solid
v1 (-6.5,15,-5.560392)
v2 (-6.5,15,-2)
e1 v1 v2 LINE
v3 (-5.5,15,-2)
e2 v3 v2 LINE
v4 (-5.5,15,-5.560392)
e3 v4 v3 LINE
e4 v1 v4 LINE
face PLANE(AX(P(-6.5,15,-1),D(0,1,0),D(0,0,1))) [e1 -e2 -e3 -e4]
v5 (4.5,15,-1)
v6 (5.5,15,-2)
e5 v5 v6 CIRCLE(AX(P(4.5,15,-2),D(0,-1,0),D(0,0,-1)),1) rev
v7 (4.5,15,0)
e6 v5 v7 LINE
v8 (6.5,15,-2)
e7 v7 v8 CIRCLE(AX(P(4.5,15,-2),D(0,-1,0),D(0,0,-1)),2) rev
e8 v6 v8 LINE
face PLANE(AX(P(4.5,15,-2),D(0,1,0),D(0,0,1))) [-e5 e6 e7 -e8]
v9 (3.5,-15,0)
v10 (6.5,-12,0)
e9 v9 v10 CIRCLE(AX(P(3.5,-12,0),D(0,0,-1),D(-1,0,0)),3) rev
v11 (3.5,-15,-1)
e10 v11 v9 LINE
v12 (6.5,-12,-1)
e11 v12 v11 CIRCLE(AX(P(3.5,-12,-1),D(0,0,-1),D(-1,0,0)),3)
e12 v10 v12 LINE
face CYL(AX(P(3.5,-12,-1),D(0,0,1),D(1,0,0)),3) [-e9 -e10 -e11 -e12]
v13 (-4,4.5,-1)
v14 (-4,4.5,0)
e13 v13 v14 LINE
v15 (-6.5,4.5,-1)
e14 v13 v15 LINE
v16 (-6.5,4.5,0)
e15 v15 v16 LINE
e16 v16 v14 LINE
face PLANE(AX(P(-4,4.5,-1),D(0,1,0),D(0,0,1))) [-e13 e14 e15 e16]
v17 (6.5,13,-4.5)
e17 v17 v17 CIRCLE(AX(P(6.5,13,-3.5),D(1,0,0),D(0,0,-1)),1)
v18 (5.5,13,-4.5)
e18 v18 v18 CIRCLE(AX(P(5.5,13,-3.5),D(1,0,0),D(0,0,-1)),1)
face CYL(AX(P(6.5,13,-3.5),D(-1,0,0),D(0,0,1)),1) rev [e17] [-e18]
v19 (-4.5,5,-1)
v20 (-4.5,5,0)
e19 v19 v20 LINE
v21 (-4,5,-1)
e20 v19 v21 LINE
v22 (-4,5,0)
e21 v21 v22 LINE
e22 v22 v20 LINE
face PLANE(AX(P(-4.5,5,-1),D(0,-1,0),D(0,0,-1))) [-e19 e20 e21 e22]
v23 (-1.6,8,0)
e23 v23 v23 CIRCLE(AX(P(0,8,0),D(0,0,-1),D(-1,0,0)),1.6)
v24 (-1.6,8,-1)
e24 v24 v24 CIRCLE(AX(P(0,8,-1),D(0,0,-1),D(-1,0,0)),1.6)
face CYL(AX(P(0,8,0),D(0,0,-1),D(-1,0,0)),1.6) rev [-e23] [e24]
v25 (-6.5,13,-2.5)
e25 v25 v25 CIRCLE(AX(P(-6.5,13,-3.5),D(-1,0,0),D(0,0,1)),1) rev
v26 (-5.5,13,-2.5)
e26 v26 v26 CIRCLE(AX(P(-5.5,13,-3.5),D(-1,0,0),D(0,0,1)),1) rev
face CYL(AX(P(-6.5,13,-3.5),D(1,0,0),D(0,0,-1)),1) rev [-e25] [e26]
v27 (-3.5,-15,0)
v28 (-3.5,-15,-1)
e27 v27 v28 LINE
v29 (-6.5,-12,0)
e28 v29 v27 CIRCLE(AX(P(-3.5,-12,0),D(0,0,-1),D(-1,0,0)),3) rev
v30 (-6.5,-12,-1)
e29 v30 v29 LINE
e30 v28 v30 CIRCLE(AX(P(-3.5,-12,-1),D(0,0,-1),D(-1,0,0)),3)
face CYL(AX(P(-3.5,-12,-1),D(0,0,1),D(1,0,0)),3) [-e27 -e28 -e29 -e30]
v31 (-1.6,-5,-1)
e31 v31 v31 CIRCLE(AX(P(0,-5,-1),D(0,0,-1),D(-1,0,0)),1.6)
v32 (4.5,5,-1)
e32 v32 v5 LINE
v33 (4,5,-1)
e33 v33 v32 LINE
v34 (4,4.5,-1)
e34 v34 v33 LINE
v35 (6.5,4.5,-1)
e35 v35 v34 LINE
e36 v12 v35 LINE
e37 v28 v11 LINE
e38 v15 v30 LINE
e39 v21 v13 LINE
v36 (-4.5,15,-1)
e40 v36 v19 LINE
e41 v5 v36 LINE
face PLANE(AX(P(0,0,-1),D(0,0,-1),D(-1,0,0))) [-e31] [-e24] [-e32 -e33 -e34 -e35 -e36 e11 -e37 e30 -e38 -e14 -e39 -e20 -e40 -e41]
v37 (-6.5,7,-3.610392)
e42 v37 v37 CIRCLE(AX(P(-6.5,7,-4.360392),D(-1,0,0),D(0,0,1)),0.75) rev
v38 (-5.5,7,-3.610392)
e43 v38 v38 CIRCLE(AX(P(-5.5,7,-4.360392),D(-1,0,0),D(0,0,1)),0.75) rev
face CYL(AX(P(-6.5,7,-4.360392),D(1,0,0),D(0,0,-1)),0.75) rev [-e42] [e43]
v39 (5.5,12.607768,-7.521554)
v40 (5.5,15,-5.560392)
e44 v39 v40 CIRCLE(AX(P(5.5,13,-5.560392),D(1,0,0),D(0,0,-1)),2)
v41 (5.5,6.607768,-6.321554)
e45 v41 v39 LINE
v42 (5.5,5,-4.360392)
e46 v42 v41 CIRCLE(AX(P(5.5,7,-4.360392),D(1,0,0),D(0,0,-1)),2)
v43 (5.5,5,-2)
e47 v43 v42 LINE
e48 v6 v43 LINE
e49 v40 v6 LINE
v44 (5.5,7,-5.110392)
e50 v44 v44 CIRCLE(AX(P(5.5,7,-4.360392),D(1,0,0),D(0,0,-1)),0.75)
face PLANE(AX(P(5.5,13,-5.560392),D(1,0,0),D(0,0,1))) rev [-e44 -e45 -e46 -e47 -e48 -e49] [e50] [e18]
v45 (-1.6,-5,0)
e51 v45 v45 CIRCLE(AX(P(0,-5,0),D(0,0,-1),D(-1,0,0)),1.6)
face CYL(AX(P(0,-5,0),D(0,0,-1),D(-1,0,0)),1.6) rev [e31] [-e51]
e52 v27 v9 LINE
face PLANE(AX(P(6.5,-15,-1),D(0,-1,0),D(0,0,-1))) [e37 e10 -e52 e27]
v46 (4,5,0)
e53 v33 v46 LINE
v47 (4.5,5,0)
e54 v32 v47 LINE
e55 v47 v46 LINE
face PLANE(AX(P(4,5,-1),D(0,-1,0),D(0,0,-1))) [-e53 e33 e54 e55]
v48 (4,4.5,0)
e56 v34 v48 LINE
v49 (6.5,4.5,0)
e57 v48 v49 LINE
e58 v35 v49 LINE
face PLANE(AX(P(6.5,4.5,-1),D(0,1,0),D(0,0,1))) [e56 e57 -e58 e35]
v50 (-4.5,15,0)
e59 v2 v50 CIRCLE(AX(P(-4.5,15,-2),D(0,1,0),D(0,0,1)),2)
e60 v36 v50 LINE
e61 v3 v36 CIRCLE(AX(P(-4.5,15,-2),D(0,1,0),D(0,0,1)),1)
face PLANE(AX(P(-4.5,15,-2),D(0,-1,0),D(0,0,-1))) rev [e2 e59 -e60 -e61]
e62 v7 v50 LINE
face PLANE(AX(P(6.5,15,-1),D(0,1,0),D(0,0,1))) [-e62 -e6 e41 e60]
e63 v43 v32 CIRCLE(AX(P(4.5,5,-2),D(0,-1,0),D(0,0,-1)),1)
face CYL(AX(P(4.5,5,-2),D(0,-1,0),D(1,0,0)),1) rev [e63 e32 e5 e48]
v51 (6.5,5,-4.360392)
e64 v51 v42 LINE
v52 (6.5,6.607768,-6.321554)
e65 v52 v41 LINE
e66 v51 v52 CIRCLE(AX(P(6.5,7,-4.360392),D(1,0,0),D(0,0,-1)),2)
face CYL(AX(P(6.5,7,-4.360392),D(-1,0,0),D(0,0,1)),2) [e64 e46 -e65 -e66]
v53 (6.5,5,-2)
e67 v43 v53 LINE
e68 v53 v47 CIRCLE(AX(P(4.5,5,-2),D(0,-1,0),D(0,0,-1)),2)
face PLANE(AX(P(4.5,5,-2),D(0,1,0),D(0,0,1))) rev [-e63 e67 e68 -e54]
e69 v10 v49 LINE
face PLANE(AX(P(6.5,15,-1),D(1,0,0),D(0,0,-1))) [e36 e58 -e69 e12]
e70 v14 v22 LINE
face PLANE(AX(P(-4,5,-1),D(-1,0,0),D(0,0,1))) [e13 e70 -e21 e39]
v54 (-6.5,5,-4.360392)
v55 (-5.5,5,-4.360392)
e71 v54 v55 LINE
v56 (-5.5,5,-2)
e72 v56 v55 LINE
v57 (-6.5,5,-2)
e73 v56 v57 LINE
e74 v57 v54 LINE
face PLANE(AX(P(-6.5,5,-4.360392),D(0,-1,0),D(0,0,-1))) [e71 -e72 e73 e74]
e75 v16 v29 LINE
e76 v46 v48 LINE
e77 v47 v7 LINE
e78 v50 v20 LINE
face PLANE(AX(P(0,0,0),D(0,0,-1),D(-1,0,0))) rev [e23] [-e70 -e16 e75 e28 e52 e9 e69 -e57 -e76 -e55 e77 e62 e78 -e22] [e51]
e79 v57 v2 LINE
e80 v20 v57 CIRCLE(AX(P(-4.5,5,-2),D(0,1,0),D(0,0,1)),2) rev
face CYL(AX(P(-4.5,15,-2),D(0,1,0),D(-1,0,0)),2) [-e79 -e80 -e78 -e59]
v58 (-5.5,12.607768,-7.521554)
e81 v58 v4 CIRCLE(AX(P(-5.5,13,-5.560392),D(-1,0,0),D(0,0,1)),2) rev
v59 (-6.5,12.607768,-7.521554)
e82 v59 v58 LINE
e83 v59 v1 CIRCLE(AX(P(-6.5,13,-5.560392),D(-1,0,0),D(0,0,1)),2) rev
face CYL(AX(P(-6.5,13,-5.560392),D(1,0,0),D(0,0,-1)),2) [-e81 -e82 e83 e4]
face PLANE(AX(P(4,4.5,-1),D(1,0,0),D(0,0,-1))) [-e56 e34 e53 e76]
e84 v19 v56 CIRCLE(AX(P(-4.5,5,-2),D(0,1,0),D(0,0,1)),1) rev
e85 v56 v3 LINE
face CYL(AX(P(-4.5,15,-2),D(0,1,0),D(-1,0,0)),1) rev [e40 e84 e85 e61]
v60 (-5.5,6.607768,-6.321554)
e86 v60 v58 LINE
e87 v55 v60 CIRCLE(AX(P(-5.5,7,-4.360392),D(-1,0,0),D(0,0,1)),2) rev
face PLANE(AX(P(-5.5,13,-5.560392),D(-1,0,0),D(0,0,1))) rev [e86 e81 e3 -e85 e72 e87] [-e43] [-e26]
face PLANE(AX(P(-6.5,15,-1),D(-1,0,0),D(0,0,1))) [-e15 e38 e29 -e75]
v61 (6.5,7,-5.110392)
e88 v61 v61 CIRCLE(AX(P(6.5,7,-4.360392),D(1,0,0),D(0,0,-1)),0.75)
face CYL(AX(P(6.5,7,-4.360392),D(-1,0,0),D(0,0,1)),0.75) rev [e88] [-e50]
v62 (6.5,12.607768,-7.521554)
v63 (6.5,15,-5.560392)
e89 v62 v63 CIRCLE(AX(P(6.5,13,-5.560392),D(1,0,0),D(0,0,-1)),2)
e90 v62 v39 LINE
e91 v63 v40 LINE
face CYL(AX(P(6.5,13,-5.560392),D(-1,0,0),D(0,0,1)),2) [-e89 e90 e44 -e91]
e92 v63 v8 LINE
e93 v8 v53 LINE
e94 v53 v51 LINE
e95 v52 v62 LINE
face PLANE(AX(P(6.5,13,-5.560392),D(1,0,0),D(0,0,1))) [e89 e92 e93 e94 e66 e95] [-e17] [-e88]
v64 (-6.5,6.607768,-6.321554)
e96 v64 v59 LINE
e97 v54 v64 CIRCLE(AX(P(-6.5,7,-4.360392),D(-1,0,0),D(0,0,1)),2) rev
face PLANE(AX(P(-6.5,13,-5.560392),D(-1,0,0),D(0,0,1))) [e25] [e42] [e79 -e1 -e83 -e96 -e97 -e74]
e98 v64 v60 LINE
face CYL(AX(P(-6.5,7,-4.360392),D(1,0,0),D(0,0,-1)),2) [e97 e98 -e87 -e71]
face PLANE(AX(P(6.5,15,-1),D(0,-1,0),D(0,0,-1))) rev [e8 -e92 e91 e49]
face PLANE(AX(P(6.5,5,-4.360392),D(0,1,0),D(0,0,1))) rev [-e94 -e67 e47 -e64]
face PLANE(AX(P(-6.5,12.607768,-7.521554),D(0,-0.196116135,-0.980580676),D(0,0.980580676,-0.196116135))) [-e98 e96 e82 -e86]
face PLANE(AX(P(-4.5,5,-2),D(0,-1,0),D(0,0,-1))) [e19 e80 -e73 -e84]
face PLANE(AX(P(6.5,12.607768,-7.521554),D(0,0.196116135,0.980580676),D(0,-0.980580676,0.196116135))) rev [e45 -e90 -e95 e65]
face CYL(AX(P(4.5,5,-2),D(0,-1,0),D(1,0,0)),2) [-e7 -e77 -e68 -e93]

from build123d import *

# Parameters (mm, degrees)
SKETCH_1_W                        = 13
SKETCH_1_H                        = 30
SM_BASE_FLANGE_1_DEPTH            = 1
SM_EDGE_FLANGE_1_STRIP_W          = 6
SM_EDGE_FLANGE_1_STRIP_H          = 1
SM_EDGE_FLANGE_1_STRIP_CUT_DEPTH  = 10
SM_EDGE_FLANGE_1_RELIEF_W         = 6.5
SM_EDGE_FLANGE_1_RELIEF_H         = 0.5
SM_EDGE_FLANGE_1_RELIEF_CUT_DEPTH = 1
SM_EDGE_FLANGE_1_DEPTH            = 10
SM_EDGE_FLANGE_1_PROFILE_R        = 1
SM_EDGE_FLANGE_1_PROFILE_R_2      = 0.75
SM_EDGE_FLANGE_1_FLAT_DEPTH       = 1
FILLET_1_R                        = 3
SKETCH_9_R                        = 1.6
CUT_EXTRUDE_1_DEPTH               = 18.615014781


# Sheet-metal steps are written as plain solids
with BuildPart() as part:
    # Sketch 1 → 基体-法兰1 (new body)
    with BuildSketch(Plane.XY):
        Rectangle(SKETCH_1_W, SKETCH_1_H)
    extrude(amount=-SM_BASE_FLANGE_1_DEPTH)

    # 边线-法兰1 strip (across the edge) → 边线-法兰1 strip cut (cut)
    with BuildSketch(Plane(origin=(-6.5, 5, -1), x_dir=(1, 0, 0), z_dir=(0, 1, 0))):
        with Locations((-1, -0.5)):
            Rectangle(SM_EDGE_FLANGE_1_STRIP_W, SM_EDGE_FLANGE_1_STRIP_H)
    sm_edge_flange_1_strip_cut = extrude(amount=SM_EDGE_FLANGE_1_STRIP_CUT_DEPTH, mode=Mode.SUBTRACT)

    # 边线-法兰1 relief (on the sheet) → 边线-法兰1 relief cut (cut)
    with BuildSketch(Plane(origin=(-4.5, 5, -1), x_dir=(1, 0, 0), z_dir=(0, 0, -1))):
        with Locations((-2.75, 0.25)):
            Rectangle(SM_EDGE_FLANGE_1_RELIEF_W, SM_EDGE_FLANGE_1_RELIEF_H)
    sm_edge_flange_1_relief_cut = extrude(amount=-SM_EDGE_FLANGE_1_RELIEF_CUT_DEPTH, mode=Mode.SUBTRACT)

    # 边线-法兰1 bend section (across the edge) → 边线-法兰1 (add)
    with BuildSketch(Plane(origin=(-6.5, 5, -1), x_dir=(1, 0, 0), z_dir=(0, 1, 0))):
        with BuildLine():
            Line((0, 1), (1, 1))
            ThreePointArc((1, 1), (1.292893219, 0.292893219), (2, 0))
            Line((2, 0), (2, -1))
            ThreePointArc((2, -1), (0.585786438, -0.414213562), (0, 1))
        make_face()
    sm_edge_flange_1 = extrude(amount=SM_EDGE_FLANGE_1_DEPTH)

    # 边线-法兰1 profile (on flange) → 边线-法兰1 flat (add)
    with BuildSketch(Plane(origin=(-6.5, 0, -1), x_dir=(0, -1, 0), z_dir=(1, 0, 0))):
        with BuildLine():
            Line((-15, 1), (-5, 1))
            Line((-5, 1), (-5, 3.360392195))
            ThreePointArc((-5, 3.360392195), (-5.453315717, 4.628370006), (-6.60776773, 5.321553546))
            Line((-6.60776773, 5.321553546), (-12.60776773, 6.521553546))
            ThreePointArc((-12.60776773, 6.521553546), (-14.267977811, 6.107076477), (-15, 4.560392195))
            Line((-15, 4.560392195), (-15, 1))
        make_face()
        with Locations((-13, 2.5)):
            Circle(SM_EDGE_FLANGE_1_PROFILE_R, mode=Mode.SUBTRACT)
        with Locations((-7, 3.360392195)):
            Circle(SM_EDGE_FLANGE_1_PROFILE_R_2, mode=Mode.SUBTRACT)
    sm_edge_flange_1_flat = extrude(amount=SM_EDGE_FLANGE_1_FLAT_DEPTH)

    # 镜向1: 边线-法兰1 strip cut, 边线-法兰1 relief cut, 边线-法兰1, 边线-法兰1 flat across plane
    add(sm_edge_flange_1_strip_cut.mirror(Plane(origin=(0, 0, 0), x_dir=(0, 0, 1), z_dir=(1, 0, 0))), mode=Mode.SUBTRACT)
    add(sm_edge_flange_1_relief_cut.mirror(Plane(origin=(0, 0, 0), x_dir=(0, 0, 1), z_dir=(1, 0, 0))), mode=Mode.SUBTRACT)
    add(sm_edge_flange_1.mirror(Plane(origin=(0, 0, 0), x_dir=(0, 0, 1), z_dir=(1, 0, 0))))
    add(sm_edge_flange_1_flat.mirror(Plane(origin=(0, 0, 0), x_dir=(0, 0, 1), z_dir=(1, 0, 0))))

    # 圆角1
    fillet_1_edges = [part.edges().sort_by_distance(p)[0] for p in [
        (6.5, -15, -0.5),
        (-6.5, -15, -0.5),
    ]]
    fillet(fillet_1_edges, radius=FILLET_1_R)

    # 草图9 → 切除-拉伸1 (cut, through all)
    with BuildSketch(Plane(origin=(0, 0, -1), x_dir=(-1, 0, 0), z_dir=(0, 0, -1))):
        with Locations((0, 8)):
            Circle(SKETCH_9_R)
        with Locations((0, -5)):
            Circle(SKETCH_9_R)
    extrude(amount=-CUT_EXTRUDE_1_DEPTH, mode=Mode.SUBTRACT)


solid = part.part
